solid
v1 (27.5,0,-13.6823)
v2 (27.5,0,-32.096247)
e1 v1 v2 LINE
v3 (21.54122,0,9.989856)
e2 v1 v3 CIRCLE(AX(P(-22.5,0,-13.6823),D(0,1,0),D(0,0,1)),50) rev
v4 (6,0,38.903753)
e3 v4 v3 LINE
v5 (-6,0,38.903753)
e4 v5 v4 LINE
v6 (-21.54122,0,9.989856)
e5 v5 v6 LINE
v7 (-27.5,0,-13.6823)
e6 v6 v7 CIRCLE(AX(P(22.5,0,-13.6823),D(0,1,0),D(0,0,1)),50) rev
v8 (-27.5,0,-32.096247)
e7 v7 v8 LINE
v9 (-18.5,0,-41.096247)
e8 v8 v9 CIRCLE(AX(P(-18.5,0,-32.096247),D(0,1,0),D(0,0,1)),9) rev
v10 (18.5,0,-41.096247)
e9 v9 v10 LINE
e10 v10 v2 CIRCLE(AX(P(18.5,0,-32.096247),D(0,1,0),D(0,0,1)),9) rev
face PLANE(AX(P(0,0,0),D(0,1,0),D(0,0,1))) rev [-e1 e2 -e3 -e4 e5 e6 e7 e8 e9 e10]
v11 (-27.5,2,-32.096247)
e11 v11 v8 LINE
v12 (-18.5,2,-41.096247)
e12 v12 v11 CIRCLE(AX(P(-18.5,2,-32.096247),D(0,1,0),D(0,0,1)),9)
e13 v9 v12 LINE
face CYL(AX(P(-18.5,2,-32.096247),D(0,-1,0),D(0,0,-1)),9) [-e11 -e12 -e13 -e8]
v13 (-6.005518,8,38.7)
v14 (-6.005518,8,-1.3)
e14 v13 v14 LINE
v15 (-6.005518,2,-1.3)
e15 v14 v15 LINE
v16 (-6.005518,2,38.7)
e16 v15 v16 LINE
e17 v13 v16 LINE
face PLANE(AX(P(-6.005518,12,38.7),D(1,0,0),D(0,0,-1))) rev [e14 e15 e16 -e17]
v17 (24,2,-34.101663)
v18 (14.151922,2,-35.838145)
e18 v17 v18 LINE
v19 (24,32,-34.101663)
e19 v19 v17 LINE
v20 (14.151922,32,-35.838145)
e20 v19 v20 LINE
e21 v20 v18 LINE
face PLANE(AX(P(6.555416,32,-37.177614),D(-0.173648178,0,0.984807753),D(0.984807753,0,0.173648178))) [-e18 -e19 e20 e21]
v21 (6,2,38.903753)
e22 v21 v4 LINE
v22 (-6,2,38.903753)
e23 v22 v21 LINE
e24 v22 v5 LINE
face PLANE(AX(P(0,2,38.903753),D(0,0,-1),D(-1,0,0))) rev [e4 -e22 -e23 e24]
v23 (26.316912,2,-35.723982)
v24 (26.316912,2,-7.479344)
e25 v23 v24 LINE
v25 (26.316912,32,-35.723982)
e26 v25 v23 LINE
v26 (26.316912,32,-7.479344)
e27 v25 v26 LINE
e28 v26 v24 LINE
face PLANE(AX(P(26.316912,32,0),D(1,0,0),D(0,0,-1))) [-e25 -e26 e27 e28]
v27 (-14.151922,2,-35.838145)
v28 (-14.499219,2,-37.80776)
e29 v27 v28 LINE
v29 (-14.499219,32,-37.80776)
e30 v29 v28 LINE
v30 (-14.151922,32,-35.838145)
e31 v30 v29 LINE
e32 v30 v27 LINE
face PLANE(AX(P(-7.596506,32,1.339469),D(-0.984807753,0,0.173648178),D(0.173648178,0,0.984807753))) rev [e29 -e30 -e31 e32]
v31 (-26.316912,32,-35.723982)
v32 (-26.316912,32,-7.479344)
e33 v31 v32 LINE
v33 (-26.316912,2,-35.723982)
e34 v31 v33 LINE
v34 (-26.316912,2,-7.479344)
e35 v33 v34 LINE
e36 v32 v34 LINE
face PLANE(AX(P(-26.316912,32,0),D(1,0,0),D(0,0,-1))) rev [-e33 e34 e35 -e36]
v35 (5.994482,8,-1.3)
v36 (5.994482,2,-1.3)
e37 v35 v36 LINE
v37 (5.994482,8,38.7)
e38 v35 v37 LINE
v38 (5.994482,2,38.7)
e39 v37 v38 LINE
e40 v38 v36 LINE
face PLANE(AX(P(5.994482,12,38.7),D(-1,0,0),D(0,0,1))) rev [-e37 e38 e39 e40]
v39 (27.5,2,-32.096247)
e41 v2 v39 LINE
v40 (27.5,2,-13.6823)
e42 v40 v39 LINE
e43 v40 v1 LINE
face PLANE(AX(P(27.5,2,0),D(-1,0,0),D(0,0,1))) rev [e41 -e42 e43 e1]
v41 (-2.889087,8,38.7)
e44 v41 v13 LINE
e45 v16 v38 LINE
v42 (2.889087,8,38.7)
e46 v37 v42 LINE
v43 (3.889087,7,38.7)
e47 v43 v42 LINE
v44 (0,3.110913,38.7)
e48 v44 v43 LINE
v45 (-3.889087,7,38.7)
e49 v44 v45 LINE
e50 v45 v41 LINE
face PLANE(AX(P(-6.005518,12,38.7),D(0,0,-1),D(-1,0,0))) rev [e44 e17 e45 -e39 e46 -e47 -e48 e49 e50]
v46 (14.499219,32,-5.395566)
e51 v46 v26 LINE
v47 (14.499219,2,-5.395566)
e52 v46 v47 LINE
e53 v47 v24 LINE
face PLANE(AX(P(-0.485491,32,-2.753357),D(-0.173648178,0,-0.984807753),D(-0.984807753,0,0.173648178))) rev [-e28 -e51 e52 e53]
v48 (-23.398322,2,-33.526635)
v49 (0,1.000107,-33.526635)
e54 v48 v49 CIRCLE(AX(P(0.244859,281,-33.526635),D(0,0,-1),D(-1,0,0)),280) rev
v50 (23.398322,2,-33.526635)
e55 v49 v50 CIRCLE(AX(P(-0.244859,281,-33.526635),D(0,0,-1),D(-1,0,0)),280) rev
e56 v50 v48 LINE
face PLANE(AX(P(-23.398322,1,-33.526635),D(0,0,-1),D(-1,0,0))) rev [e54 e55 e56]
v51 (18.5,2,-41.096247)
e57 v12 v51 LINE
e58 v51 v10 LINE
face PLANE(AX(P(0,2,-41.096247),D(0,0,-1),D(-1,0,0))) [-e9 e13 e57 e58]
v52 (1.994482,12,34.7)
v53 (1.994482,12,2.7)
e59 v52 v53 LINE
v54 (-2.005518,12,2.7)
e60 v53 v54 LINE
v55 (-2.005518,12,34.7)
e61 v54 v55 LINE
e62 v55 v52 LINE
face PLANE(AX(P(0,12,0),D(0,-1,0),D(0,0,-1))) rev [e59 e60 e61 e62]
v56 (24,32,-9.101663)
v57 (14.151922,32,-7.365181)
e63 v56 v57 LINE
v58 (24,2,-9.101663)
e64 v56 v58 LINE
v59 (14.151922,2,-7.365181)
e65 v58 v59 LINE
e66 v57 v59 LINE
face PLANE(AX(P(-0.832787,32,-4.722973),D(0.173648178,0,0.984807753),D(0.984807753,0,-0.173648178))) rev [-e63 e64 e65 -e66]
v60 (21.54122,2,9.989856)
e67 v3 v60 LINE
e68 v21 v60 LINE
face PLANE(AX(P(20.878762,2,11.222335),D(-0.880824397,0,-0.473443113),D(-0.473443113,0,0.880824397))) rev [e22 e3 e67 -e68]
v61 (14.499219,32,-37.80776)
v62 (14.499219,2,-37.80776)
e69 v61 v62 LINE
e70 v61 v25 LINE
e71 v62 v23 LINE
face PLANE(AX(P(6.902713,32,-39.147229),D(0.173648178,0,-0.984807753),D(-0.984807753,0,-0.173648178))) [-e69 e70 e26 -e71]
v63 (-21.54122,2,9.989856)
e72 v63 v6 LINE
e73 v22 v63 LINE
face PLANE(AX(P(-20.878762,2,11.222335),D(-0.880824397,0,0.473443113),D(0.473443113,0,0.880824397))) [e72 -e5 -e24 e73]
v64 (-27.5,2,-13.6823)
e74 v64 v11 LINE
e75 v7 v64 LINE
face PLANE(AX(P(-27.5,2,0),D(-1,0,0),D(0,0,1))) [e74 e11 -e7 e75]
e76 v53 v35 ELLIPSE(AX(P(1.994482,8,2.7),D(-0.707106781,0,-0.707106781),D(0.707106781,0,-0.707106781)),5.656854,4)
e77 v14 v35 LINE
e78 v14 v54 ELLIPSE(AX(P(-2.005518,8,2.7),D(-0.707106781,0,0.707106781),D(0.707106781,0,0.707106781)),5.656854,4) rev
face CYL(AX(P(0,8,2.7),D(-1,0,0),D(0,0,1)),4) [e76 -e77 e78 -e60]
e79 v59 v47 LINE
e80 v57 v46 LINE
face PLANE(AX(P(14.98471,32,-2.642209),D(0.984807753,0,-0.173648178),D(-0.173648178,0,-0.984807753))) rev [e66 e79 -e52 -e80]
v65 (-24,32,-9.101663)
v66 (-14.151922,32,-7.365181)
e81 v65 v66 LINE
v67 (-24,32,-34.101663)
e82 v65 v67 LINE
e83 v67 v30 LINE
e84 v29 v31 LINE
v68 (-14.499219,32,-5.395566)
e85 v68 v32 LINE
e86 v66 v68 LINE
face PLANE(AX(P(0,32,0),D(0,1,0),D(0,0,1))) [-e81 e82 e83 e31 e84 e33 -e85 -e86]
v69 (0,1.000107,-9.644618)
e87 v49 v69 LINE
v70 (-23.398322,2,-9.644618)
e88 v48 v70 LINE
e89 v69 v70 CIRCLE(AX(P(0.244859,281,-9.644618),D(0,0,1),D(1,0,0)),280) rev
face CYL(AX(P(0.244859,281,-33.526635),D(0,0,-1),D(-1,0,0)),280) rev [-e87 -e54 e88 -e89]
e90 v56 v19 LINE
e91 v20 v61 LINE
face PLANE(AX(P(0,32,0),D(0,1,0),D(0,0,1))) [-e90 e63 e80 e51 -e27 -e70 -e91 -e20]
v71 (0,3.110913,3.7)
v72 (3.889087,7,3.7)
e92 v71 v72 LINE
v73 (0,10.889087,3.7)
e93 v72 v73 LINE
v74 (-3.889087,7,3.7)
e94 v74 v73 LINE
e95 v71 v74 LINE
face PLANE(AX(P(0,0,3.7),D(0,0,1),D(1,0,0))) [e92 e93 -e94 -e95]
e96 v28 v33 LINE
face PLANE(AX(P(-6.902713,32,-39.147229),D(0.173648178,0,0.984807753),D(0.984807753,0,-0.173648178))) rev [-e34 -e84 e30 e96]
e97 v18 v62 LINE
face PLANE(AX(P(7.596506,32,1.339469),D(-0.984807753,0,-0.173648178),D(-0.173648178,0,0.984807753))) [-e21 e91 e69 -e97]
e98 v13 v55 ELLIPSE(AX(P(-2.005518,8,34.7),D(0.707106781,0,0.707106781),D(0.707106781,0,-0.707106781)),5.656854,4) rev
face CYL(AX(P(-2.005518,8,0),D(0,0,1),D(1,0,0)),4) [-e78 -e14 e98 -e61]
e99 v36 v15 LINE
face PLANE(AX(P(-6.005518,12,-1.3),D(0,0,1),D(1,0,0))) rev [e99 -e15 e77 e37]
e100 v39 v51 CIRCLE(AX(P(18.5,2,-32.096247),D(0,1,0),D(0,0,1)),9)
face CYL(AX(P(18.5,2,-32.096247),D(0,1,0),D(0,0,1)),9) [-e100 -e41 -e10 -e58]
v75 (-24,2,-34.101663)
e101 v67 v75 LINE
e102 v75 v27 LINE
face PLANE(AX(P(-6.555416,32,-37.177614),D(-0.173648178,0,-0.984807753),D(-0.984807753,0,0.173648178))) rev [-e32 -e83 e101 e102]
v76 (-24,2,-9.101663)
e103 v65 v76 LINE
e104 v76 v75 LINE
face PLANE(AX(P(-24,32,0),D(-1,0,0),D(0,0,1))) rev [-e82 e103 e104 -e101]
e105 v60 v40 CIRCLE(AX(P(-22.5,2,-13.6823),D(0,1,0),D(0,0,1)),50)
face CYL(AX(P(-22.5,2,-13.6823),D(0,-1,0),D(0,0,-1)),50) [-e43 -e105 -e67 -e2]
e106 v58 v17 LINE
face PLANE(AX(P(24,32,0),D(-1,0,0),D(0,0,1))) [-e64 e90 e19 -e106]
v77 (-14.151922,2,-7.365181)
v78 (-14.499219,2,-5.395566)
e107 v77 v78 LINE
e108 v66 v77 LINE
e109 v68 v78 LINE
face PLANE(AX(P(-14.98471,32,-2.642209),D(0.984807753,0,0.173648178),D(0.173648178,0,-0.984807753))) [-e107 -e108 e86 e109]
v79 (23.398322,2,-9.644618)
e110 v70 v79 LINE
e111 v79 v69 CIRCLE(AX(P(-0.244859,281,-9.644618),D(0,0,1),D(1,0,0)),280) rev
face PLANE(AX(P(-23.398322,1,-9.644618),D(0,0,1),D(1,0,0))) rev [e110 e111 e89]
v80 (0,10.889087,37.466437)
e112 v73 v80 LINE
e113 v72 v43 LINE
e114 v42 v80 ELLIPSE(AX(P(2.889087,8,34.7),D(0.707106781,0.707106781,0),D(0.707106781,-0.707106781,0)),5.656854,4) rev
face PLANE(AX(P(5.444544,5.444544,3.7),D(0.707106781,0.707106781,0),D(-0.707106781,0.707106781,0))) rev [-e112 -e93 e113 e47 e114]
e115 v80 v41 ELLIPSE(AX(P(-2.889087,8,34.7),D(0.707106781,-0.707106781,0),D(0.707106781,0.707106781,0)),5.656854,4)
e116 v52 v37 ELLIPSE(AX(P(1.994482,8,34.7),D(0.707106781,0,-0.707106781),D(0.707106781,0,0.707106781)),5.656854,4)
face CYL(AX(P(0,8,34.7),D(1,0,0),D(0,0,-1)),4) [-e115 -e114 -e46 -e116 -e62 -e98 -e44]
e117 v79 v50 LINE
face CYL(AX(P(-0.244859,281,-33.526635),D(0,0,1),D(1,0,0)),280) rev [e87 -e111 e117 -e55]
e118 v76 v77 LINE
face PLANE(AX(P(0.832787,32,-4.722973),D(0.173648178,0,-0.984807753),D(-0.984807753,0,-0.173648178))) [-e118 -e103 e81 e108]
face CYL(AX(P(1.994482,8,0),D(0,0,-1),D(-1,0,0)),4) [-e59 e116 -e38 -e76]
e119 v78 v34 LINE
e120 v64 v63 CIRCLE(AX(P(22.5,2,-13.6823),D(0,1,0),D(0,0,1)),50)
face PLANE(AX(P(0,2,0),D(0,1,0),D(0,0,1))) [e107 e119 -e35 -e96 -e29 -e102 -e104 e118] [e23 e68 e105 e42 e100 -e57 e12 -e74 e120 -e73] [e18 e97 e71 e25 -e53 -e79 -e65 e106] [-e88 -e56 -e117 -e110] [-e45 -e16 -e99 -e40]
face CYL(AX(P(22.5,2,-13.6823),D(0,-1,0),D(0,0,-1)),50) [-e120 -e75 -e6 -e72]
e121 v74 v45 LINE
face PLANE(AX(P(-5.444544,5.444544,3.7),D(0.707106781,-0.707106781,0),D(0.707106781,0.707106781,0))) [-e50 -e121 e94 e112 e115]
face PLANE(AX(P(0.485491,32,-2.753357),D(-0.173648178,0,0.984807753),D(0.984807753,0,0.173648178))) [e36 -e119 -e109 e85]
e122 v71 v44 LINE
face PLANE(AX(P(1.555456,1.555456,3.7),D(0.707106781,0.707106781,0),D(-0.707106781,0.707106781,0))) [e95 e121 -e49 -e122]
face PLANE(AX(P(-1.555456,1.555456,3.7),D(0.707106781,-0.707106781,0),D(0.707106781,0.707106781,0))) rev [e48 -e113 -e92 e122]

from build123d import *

# Parameters (mm, degrees)
BOSS_EXTRUDE1_DEPTH = 2
BOSS_EXTRUDE2_DEPTH = 30
SKETCH3_W           = 12
SKETCH3_H           = 40
BOSS_EXTRUDE3_DEPTH = 10
CUT_EXTRUDE1_DEPTH  = 35
SKETCH6_W           = 46.796643592
SKETCH6_H           = 23.882016553
CUT_EXTRUDE2_DEPTH  = 1
FILLET1_R           = 280
FILLET2_R           = 9
FILLET3_R           = 4
FILLET4_R           = 50


with BuildPart() as part:
    # Sketch1 → Boss-Extrude1 (new body)
    with BuildSketch(Plane(origin=(0, 0, 0), x_dir=(1, 0, 0), z_dir=(0, 1, 0))):
        Polygon((-27.5, 1.096246938), (-6, -38.903753062), (6, -38.903753062), (27.5, 1.096246938), (27.5, 41.096246938), (-27.5, 41.096246938), align=None)
    extrude(amount=BOSS_EXTRUDE1_DEPTH)

    # Sketch2 → Boss-Extrude2 (add)
    with BuildSketch(Plane(origin=(0, 2, 0), x_dir=(1, 0, 0), z_dir=(0, 1, 0))):
        Polygon((-24, 9.101662984), (-24, 34.101662984), (-14.15192247, 35.838144761), (-14.499218825, 37.807760267), (-26.316911861, 35.723982135), (-26.316911861, 7.479343833), (-14.499218825, 5.395565701), (-14.15192247, 7.365181207), align=None)
        Polygon((14.15192247, 7.365181207), (14.499218825, 5.395565701), (26.316911861, 7.479343833), (26.316911861, 35.723982135), (14.499218825, 37.807760267), (14.15192247, 35.838144761), (24, 34.101662984), (24, 9.101662984), align=None)
    extrude(amount=BOSS_EXTRUDE2_DEPTH)

    # Sketch3 → Boss-Extrude3 (add)
    with BuildSketch(Plane(origin=(0, 2, 0), x_dir=(1, 0, 0), z_dir=(0, 1, 0))):
        with Locations((-0.005517933, -18.7)):
            Rectangle(SKETCH3_W, SKETCH3_H)
    extrude(amount=BOSS_EXTRUDE3_DEPTH)

    # Sketch4 → Cut-Extrude1 (cut)
    with BuildSketch(Plane.XY.offset(38.7)):
        Polygon((0, 3.110912703), (3.889087297, 7), (0, 10.889087297), (-3.889087297, 7), align=None)
    extrude(amount=-CUT_EXTRUDE1_DEPTH, mode=Mode.SUBTRACT)

    # Sketch6 → Cut-Extrude2 (cut)
    with BuildSketch(Plane(origin=(0, 2, 0), x_dir=(1, 0, 0), z_dir=(0, 1, 0))):
        with Locations((0, 21.585626422)):
            Rectangle(SKETCH6_W, SKETCH6_H)
    extrude(amount=-CUT_EXTRUDE2_DEPTH, mode=Mode.SUBTRACT)

    # Fillet1
    # the kernel refuses this fillet: 280 mm, written as the material it adds along each edge
    with BuildSketch(Plane(origin=(23.398321796, 1, -92.634586786), x_dir=(0, 1, 0), z_dir=(0, 0, 1))) as fillet1_piece_1_section:
        with BuildLine():
            CenterArc((280, 23.643180835), FILLET1_R, 180, 4.843819526)
            Line((0, 23.643180835), (0, 0))
            Line((0, 0), (1, 0))
        make_face()
    fillet1_piece_1 = extrude(amount=142.097920729, mode=Mode.PRIVATE)
    fillet1_piece_1 = split(fillet1_piece_1, bisect_by=Plane(origin=(14.446064127, 1.194161729, -5.386193094), z_dir=(-0.1736481776669284, 0, -0.9848077530122085)), keep=Keep.TOP, mode=Mode.PRIVATE)
    fillet1_piece_1 = split(fillet1_piece_1, bisect_by=Plane(origin=(14.451548954, 1.194161729, -37.816165751), z_dir=(-0.17364817766692828, 0, 0.9848077530122085)), keep=Keep.TOP, mode=Mode.PRIVATE)
    add(fillet1_piece_1)
    with BuildSketch(Plane(origin=(-23.398321796, 1, -9.644618145), x_dir=(0, 1, 0), z_dir=(0, 0, -1))) as fillet1_piece_2:
        with BuildLine():
            CenterArc((280, 23.643180835), FILLET1_R, 180, 4.843819526)
            Line((0, 23.643180835), (0, 0))
            Line((0, 0), (1, 0))
        make_face()
    extrude(amount=23.882016554)

    # Fillet2
    fillet2_edges = [part.edges().sort_by_distance(p)[0] for p in [
        (-27.5, 1, -41.096246938),
        (27.5, 1, -41.096246938),
    ]]
    fillet(fillet2_edges, radius=FILLET2_R)

    # Fillet3
    # the kernel refuses this fillet: 4 mm, written as the material it takes off along each edge
    with BuildSketch(Plane(origin=(5.994482067, 12, 48.7), x_dir=(0, -1, 0), z_dir=(0, 0, -1)), Plane(origin=(-6.005517933, 12, -11.3), x_dir=(0, -1, 0), z_dir=(0, 0, 1))) as fillet3_piece_1:
        with BuildLine():
            CenterArc((FILLET3_R, FILLET3_R), FILLET3_R, 180, 90)
            Line((0, FILLET3_R), (0, 0))
            Line((0, 0), (FILLET3_R, 0))
        make_face()
    extrude(amount=60, mode=Mode.SUBTRACT)
    with BuildSketch(Plane(origin=(15.994482067, 12, -1.3), x_dir=(0, -1, 0), z_dir=(-1, 0, 0)), Plane(origin=(-16.005517933, 12, 38.7), x_dir=(0, -1, 0), z_dir=(1, 0, 0))) as fillet3_piece_2:
        with BuildLine():
            CenterArc((FILLET3_R, FILLET3_R), FILLET3_R, 180, 90)
            Line((0, FILLET3_R), (0, 0))
            Line((0, 0), (FILLET3_R, 0))
        make_face()
    extrude(amount=32, mode=Mode.SUBTRACT)

    # Fillet4
    fillet4_edges = [part.edges().sort_by_distance(p)[0] for p in [
        (-27.5, 1, -1.096246938),
        (27.5, 1, -1.096246938),
    ]]
    fillet(fillet4_edges, radius=FILLET4_R)


solid = part.part
